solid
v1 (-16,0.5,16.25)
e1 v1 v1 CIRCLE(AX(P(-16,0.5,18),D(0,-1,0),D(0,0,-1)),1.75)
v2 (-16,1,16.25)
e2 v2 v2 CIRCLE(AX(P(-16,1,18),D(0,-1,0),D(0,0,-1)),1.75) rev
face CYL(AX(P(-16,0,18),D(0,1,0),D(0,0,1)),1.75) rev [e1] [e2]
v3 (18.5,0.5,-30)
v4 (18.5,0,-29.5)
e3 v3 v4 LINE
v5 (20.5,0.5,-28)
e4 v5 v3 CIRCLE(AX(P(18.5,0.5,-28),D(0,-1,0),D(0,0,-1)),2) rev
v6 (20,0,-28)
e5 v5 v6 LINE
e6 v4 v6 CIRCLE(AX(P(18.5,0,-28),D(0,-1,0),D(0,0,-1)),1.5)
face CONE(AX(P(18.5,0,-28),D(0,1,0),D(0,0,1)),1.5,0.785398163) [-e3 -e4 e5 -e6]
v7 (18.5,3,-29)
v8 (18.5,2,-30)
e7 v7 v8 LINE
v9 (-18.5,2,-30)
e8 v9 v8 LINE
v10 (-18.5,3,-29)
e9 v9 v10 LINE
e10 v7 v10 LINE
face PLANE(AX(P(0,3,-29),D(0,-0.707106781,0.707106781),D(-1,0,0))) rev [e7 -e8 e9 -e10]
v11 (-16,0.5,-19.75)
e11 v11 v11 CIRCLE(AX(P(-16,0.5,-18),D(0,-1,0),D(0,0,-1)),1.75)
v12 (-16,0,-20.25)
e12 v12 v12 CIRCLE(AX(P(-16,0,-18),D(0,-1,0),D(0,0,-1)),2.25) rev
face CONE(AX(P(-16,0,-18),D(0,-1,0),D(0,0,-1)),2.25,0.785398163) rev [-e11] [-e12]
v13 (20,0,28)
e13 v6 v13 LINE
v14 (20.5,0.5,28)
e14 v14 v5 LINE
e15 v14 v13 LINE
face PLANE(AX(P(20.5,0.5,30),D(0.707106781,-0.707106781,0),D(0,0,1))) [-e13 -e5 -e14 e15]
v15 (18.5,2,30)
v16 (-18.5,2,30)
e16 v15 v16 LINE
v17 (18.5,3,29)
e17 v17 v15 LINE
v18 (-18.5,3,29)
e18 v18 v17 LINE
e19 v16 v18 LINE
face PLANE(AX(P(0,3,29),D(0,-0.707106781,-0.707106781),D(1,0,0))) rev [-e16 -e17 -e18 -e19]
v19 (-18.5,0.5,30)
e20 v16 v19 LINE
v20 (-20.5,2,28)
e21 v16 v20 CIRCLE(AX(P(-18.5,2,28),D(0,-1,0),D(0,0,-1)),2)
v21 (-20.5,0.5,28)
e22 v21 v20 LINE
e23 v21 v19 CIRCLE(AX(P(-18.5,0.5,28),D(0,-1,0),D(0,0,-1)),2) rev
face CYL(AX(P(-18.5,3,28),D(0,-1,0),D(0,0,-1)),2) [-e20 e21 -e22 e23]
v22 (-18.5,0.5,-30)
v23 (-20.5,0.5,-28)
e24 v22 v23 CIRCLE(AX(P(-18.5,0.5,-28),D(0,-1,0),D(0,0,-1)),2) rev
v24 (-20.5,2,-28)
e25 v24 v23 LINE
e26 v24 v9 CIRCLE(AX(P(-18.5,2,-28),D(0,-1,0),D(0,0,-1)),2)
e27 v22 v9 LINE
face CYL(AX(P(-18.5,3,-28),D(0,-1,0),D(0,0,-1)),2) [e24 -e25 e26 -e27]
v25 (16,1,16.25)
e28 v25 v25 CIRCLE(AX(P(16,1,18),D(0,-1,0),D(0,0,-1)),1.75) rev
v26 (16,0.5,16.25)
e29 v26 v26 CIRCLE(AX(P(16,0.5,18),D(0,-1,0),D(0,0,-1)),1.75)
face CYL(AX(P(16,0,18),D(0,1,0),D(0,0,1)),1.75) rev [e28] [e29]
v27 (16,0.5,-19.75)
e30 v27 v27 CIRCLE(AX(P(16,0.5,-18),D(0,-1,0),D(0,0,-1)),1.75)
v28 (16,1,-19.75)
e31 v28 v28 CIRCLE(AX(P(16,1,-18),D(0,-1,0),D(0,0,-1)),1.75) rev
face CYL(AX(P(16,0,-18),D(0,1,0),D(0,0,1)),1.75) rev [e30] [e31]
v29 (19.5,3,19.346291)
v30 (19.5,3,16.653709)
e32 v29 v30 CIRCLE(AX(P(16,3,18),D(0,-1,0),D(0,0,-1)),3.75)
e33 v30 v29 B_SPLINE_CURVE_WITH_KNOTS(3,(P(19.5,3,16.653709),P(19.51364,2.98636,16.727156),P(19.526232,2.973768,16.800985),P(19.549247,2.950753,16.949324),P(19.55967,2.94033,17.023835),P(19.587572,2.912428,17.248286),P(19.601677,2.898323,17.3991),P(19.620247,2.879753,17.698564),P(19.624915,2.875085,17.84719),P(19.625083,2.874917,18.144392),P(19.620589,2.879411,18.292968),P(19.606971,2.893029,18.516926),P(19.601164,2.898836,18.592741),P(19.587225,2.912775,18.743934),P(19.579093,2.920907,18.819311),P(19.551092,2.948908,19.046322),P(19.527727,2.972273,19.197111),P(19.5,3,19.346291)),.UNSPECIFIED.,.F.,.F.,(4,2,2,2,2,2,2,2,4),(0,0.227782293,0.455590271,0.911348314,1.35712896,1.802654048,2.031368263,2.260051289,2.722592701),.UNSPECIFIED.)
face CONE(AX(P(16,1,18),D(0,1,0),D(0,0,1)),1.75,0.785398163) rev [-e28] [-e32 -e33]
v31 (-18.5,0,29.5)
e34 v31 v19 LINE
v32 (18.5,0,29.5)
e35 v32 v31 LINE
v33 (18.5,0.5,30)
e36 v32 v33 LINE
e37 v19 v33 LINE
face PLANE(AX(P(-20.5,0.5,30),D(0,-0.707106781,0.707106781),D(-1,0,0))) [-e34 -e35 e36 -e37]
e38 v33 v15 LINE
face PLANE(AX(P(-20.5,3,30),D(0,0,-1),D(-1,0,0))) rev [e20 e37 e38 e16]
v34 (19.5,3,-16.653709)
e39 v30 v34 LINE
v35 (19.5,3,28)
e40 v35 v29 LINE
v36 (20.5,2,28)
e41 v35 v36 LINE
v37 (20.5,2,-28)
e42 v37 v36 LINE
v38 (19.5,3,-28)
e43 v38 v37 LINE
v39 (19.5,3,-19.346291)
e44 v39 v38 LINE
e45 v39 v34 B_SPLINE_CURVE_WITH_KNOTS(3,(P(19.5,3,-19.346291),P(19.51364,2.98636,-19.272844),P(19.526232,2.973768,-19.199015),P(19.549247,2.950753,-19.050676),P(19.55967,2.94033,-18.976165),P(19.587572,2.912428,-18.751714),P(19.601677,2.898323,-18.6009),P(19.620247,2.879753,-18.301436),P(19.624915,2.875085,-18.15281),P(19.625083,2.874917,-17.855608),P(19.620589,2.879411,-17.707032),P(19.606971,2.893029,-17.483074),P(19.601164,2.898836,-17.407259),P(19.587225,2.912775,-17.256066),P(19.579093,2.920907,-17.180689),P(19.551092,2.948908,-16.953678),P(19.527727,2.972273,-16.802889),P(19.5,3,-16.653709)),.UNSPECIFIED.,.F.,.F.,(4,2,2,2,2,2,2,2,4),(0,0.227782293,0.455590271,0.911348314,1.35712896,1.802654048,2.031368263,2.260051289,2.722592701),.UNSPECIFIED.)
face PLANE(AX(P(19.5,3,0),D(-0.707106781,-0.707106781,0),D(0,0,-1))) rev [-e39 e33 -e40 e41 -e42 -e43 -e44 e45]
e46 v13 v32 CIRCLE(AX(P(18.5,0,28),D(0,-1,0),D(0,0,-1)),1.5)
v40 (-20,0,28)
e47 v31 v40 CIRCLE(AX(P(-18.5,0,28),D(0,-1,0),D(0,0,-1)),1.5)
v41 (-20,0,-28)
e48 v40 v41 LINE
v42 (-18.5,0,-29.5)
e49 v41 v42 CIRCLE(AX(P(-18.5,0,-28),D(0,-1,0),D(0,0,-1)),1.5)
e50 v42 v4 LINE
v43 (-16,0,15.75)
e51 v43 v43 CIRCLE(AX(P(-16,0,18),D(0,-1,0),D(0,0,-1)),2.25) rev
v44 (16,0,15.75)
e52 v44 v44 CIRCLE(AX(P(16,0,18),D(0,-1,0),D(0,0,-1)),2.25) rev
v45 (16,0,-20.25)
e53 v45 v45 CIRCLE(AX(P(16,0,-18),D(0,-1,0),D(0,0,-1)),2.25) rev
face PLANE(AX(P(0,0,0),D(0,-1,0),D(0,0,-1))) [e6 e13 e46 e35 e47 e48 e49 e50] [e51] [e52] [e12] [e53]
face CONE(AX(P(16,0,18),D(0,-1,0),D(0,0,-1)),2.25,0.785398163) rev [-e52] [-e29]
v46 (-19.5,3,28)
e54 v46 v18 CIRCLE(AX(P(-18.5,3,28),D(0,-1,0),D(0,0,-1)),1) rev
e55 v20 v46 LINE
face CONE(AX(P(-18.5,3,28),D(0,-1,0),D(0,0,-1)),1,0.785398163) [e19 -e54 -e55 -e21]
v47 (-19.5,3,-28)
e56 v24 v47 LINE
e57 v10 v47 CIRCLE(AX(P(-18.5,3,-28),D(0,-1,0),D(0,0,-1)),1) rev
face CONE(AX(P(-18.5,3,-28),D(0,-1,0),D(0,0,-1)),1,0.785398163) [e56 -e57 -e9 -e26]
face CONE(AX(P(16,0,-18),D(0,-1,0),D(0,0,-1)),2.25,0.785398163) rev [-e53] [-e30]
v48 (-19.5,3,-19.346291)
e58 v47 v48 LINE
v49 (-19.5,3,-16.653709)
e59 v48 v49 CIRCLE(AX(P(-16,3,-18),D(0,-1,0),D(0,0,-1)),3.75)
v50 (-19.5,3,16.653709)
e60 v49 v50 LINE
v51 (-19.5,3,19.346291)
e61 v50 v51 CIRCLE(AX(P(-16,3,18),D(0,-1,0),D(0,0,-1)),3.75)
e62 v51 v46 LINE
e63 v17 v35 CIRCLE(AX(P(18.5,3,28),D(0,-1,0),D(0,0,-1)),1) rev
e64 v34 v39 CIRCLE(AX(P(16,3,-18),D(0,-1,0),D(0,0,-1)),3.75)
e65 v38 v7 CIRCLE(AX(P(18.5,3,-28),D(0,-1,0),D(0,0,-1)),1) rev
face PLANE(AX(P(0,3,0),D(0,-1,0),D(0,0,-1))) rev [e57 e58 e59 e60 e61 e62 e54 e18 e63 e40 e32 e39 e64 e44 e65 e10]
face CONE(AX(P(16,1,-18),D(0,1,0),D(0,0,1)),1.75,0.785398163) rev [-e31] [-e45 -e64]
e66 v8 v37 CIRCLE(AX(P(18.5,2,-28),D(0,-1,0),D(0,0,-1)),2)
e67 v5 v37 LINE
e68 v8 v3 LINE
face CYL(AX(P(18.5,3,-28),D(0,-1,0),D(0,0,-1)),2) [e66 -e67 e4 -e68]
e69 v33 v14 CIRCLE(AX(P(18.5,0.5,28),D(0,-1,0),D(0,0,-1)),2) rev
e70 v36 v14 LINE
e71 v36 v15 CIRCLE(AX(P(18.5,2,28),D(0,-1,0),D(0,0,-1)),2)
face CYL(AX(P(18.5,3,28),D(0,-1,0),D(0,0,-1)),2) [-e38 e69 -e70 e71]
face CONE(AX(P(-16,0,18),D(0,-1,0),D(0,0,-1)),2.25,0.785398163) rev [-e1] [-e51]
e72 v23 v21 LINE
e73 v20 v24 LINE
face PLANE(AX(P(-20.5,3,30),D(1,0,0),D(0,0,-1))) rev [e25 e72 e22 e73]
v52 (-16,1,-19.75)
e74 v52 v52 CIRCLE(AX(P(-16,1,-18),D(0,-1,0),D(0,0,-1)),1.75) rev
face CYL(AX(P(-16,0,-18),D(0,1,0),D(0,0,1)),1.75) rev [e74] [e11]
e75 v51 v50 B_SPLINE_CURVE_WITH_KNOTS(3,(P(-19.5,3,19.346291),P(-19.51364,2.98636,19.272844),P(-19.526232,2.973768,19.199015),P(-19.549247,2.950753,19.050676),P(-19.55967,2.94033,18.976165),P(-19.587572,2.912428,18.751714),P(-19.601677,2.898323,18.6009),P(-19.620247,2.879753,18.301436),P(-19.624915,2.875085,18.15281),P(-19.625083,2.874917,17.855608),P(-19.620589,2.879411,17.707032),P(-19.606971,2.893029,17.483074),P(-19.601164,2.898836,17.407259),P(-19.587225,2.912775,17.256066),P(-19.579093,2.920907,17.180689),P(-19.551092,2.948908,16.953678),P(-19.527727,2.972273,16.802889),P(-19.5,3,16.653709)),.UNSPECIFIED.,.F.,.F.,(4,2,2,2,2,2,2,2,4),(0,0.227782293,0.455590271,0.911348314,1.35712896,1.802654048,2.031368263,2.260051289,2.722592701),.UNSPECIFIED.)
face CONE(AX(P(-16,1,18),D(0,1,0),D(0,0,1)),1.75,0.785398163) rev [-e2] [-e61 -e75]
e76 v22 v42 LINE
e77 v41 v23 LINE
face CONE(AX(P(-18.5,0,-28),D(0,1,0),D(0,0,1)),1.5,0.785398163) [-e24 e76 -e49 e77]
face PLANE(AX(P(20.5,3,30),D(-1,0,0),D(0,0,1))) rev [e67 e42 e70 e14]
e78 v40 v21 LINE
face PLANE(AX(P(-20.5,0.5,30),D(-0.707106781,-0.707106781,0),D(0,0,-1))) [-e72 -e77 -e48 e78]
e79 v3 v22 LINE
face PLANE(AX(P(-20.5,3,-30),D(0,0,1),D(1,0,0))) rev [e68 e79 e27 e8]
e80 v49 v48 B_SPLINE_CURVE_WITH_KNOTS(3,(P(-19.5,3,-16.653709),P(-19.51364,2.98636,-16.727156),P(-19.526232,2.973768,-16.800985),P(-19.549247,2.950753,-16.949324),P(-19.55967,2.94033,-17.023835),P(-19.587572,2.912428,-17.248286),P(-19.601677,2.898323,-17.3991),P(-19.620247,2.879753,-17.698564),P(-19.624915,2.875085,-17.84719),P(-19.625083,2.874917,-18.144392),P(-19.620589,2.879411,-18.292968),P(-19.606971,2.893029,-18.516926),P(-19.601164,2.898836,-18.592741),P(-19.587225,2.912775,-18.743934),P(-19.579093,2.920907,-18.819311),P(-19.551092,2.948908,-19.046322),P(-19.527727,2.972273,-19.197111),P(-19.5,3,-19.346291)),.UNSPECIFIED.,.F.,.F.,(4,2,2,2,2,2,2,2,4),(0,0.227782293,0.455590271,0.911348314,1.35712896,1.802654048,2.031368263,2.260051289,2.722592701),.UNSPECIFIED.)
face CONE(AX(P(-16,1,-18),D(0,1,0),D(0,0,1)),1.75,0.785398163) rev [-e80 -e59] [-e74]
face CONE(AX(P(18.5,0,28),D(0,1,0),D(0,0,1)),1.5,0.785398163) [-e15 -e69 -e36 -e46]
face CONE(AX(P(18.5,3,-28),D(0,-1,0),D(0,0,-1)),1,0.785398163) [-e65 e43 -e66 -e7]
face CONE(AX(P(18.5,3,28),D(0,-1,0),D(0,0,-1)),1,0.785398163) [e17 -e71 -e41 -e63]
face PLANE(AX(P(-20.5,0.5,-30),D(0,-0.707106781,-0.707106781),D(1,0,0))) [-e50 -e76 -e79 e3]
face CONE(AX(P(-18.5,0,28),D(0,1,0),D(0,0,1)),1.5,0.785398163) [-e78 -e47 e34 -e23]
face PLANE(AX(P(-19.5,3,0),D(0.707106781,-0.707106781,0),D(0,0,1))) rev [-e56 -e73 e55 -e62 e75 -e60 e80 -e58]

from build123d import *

# Parameters (mm, degrees)
SKETCH_1_W          = 41
SKETCH_1_H          = 60
EXTRUDE_1_DEPTH     = 3
SKETCH_2_R          = 1.75
CUT_EXTRUDE_1_DEPTH = 3
FILLET_1_R          = 2
CHAMFER_2_SIZE      = 1
CHAMFER_1_SIZE      = 2
CHAMFER_3_SIZE      = 0.5


with BuildPart() as part:
    # Эскиз1 → Бобышка-Вытянуть1 (new body)
    with BuildSketch(Plane(origin=(0, 0, 0), x_dir=(1, 0, 0), z_dir=(0, 1, 0))):
        Rectangle(SKETCH_1_W, SKETCH_1_H)
    extrude(amount=EXTRUDE_1_DEPTH)

    # Эскиз2 → Вырез-Вытянуть1 (cut)
    with BuildSketch(Plane(origin=(0, 3, 0), x_dir=(1, 0, 0), z_dir=(0, 1, 0))):
        with Locations(Location((16, 18, 0), (0, 0, 270))):
            Circle(SKETCH_2_R)
        with Locations(Location((16, -18, 0), (0, 0, 90))):
            Circle(SKETCH_2_R)
        with Locations(Location((-16, -18, 0), (0, 0, 270))):
            Circle(SKETCH_2_R)
        with Locations(Location((-16, 18, 0), (0, 0, 90))):
            Circle(SKETCH_2_R)
    extrude(amount=-CUT_EXTRUDE_1_DEPTH, mode=Mode.SUBTRACT)

    # Скругление1
    fillet_1_edges = [part.edges().sort_by_distance(p)[0] for p in [
        (20.5, 1.5, 30),
        (-20.5, 1.5, 30),
        (-20.5, 1.5, -30),
        (20.5, 1.5, -30),
    ]]
    fillet(fillet_1_edges, radius=FILLET_1_R)

    # Фаска2
    chamfer_2_edges = [part.edges().sort_by_distance(p)[0] for p in [
        (0, 3, -30),
        (20.5, 3, 0),
        (-20.5, 3, 0),
        (0, 3, 30),
        (19.914213562, 3, 29.414213562),
        (-19.914213562, 3, 29.414213562),
        (-19.914213562, 3, -29.414213562),
        (19.914213562, 3, -29.414213562),
    ]]
    chamfer(chamfer_2_edges, length=CHAMFER_2_SIZE)

    # Фаска1
    # the kernel refuses this chamfer: 2 mm, written as the material it takes off along each edge
    with BuildSketch(Plane(origin=(-16, 3, -18), x_dir=(0, 0, -1), z_dir=(1, 0, 0))) as chamfer_1_piece_1:
        Polygon((1.75 + CHAMFER_1_SIZE, 0), (1.75, -CHAMFER_1_SIZE), (1.75, 0), align=None)
    revolve(axis=Axis((-16, 3, -18), (0, 1, 0)), mode=Mode.SUBTRACT)
    with BuildSketch(Plane(origin=(-16, 3, 18), x_dir=(0, 0, 1), z_dir=(-1, 0, 0))) as chamfer_1_piece_2:
        Polygon((1.75 + CHAMFER_1_SIZE, 0), (1.75, -CHAMFER_1_SIZE), (1.75, 0), align=None)
    revolve(axis=Axis((-16, 3, 18), (0, 1, 0)), mode=Mode.SUBTRACT)
    with BuildSketch(Plane(origin=(16, 3, 18), x_dir=(0, 0, -1), z_dir=(1, 0, 0))) as chamfer_1_piece_3:
        Polygon((1.75 + CHAMFER_1_SIZE, 0), (1.75, -CHAMFER_1_SIZE), (1.75, 0), align=None)
    revolve(axis=Axis((16, 3, 18), (0, 1, 0)), mode=Mode.SUBTRACT)
    with BuildSketch(Plane(origin=(16, 3, -18), x_dir=(0, 0, 1), z_dir=(-1, 0, 0))) as chamfer_1_piece_4:
        Polygon((1.75 + CHAMFER_1_SIZE, 0), (1.75, -CHAMFER_1_SIZE), (1.75, 0), align=None)
    revolve(axis=Axis((16, 3, -18), (0, 1, 0)), mode=Mode.SUBTRACT)

    # Фаска3
    chamfer_3_edges = [part.edges().sort_by_distance(p)[0] for p in [
        (-16, 0, -16.25),
        (-16, 0, 16.25),
        (16, 0, 19.75),
        (16, 0, -19.75),
        (0, 0, -30),
        (20.5, 0, 0),
        (0, 0, 30),
        (-20.5, 0, 0),
        (19.914213562, 0, 29.414213562),
        (-19.914213562, 0, 29.414213562),
        (-19.914213562, 0, -29.414213562),
        (19.914213562, 0, -29.414213562),
    ]]
    chamfer(chamfer_3_edges, length=CHAMFER_3_SIZE)


solid = part.part
